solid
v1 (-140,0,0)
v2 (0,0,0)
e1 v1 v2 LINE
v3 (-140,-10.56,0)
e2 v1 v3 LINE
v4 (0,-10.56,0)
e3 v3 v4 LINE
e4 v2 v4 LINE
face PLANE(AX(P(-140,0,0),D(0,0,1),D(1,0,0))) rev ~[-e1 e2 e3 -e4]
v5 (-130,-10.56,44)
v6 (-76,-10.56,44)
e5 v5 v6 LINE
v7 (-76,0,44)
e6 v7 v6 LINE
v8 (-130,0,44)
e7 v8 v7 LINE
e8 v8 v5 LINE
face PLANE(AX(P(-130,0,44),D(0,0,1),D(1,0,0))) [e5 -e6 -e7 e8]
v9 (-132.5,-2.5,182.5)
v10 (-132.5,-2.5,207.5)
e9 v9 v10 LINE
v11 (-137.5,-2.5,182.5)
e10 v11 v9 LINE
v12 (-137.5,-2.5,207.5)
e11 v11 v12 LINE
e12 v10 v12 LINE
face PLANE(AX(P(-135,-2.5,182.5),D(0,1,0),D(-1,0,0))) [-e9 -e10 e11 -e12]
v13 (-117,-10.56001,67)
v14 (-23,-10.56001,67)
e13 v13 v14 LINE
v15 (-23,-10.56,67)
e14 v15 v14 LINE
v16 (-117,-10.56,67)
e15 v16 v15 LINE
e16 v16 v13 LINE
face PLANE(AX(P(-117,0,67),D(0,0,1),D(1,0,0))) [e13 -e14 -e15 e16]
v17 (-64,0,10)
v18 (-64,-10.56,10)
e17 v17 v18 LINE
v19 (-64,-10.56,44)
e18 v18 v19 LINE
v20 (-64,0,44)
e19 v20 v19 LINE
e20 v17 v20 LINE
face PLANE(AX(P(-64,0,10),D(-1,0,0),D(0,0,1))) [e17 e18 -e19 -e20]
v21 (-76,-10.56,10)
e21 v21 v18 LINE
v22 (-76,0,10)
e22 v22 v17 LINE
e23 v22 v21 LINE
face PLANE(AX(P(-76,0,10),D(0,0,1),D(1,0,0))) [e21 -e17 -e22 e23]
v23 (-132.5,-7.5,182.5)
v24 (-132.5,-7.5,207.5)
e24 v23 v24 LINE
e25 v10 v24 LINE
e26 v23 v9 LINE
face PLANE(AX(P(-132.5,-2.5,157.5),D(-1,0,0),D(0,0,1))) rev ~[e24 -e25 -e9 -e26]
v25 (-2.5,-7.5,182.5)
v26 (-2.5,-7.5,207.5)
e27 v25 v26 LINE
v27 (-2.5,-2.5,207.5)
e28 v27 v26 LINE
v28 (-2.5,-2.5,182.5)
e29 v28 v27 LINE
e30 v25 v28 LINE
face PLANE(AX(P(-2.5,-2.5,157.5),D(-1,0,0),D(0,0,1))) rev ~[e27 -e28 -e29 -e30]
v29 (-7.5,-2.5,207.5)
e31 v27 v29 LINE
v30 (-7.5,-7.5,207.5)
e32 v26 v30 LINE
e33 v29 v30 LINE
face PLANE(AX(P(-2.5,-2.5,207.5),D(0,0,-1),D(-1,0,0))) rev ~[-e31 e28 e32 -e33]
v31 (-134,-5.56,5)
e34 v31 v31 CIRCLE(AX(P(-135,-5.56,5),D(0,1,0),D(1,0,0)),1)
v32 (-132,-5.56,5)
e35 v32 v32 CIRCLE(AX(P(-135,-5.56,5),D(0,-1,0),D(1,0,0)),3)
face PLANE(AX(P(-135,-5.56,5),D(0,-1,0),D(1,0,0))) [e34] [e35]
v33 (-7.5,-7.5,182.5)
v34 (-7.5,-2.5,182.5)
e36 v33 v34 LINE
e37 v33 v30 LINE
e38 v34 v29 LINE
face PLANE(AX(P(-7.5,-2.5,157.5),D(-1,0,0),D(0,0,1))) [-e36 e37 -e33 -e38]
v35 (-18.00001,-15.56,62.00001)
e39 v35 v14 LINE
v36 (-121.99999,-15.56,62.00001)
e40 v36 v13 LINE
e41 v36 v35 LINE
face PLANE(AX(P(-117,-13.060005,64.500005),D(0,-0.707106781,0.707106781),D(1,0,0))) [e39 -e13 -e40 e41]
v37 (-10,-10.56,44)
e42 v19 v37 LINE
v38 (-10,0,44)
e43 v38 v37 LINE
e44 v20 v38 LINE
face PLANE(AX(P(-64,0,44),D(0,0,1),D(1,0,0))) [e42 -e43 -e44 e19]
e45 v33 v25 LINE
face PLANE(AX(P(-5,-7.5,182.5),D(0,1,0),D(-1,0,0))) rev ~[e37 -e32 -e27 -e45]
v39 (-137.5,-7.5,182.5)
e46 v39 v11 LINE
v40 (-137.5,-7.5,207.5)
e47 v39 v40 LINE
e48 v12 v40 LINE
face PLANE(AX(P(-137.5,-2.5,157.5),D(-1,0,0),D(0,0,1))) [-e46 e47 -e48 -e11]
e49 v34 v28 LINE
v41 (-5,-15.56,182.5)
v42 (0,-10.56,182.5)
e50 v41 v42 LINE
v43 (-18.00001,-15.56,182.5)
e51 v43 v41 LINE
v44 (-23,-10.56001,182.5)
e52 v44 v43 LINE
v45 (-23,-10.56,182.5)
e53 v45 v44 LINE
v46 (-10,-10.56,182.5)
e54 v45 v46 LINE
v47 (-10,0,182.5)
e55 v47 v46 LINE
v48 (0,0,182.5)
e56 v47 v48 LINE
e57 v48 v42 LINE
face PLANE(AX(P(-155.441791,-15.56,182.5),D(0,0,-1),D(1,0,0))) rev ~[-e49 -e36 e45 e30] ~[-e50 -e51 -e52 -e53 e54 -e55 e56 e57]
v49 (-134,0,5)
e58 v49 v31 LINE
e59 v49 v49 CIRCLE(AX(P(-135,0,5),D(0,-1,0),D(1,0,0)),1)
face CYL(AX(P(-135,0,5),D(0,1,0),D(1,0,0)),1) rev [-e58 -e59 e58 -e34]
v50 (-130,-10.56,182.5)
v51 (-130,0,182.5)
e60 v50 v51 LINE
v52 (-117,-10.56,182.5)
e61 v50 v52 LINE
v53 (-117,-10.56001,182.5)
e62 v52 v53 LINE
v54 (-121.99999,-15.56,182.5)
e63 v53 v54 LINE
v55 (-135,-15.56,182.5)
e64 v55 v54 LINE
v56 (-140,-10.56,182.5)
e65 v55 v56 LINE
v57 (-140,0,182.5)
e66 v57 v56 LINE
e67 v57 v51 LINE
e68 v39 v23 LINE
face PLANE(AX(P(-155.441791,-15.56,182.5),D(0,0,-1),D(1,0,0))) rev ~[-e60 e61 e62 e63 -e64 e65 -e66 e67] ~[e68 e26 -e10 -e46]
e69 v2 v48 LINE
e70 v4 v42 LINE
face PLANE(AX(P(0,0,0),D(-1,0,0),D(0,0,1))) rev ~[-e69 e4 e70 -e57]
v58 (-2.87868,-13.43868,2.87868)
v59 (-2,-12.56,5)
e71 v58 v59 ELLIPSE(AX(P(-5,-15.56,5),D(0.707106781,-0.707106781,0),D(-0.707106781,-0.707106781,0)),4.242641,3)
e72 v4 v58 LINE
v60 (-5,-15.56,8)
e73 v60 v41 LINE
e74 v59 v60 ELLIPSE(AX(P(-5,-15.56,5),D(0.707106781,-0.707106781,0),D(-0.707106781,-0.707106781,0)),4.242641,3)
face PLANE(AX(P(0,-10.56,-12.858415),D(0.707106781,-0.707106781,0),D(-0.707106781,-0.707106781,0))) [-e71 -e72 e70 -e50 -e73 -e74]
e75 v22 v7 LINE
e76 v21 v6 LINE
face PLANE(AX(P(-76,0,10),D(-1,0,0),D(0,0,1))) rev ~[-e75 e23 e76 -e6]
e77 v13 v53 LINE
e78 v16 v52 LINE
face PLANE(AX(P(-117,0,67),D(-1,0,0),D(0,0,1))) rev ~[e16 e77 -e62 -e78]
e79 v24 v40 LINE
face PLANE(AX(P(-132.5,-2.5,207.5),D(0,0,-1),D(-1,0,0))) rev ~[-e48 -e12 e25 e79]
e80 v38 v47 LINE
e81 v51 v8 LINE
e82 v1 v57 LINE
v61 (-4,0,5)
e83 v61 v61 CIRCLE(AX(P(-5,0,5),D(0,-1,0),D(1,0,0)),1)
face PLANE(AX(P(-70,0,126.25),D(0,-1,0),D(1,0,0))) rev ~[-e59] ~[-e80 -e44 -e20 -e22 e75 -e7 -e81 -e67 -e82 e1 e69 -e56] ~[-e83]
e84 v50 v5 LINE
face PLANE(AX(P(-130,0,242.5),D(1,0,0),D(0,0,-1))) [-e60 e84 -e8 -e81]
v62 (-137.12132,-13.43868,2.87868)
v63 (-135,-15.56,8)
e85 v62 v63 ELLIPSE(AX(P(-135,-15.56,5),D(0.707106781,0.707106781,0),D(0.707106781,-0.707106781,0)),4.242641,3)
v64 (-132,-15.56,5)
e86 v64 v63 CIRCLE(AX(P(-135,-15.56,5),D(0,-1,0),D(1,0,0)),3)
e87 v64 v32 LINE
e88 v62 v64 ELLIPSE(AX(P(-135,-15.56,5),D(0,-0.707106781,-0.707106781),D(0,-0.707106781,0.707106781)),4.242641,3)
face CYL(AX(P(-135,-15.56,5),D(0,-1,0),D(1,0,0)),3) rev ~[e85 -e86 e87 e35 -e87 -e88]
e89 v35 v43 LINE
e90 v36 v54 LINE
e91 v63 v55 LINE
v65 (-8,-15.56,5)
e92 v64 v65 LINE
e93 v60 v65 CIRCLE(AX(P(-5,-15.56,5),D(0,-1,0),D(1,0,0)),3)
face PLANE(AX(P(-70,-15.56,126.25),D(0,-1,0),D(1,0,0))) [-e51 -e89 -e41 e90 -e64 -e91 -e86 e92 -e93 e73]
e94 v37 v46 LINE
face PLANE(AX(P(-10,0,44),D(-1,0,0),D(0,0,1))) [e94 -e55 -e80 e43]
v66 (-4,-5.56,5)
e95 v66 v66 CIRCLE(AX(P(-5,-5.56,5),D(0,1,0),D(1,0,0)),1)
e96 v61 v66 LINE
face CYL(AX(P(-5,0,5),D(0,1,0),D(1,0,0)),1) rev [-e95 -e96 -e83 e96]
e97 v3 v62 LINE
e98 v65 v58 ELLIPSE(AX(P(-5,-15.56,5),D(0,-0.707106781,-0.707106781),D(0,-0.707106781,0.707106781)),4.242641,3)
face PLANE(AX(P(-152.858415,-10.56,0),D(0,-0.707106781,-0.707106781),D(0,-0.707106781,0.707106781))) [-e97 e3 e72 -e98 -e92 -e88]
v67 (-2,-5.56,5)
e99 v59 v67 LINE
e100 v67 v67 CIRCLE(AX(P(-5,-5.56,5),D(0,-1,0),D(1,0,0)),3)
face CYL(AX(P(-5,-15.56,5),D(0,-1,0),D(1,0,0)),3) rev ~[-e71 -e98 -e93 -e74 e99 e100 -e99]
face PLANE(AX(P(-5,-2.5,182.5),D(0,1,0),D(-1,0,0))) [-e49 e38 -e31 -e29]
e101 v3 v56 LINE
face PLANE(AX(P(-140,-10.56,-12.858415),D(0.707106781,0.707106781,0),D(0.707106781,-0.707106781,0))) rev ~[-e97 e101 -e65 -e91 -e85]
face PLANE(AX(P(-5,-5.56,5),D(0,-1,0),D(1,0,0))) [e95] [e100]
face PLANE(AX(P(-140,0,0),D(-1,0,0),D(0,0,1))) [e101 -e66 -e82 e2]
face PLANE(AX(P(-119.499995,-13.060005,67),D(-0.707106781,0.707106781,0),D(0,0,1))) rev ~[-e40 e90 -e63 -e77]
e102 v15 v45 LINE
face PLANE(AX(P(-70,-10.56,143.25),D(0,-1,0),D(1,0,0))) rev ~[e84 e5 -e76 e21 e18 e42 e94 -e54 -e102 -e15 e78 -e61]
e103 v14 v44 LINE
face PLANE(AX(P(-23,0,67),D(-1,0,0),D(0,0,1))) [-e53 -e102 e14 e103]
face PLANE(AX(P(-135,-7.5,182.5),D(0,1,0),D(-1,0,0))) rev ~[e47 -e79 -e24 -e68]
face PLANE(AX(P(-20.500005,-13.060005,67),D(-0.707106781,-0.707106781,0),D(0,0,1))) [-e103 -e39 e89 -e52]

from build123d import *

# Parameters (mm, degrees)
F0_W        = 140
F0_H        = 252.5
F0_R        = 1
F0_W_2      = 94
F0_H_2      = 152.5
F0_R_2      = 2.5
F0_W_3      = 12
F0_H_3      = 34
F1_DEPTH    = 15.56
F2_DEPTH    = 10.56
F3_T1_DEPTH = 165.7168298797
F3_T3_DEPTH = 278.2168298797
F4_SIZE     = 2.5
F5_R        = 3
F6_DEPTH    = 10
F7_SIZE     = 4.99999
F8_W        = 161.2529857084
F8_H        = 70
F9_DEPTH    = 25
F11_W       = 5
F11_H       = 50
F12_DEPTH   = 5


# Not quite as in the source:
# - a fillet or chamfer that OpenCascade refuses, or shapes differently, is made with other operations: its cross-section is extruded or revolved along the edge and cut away or added
# - a fillet or chamfer is up to 0.001 mm smaller than in the source, because OpenCascade refuses the exact size
# - a feature names something its author has since deleted; it is built from what else it names


with BuildPart() as f1:
    # F0 (on Front) → F1 (new body)
    with BuildSketch(Plane.XZ):
        with Locations((-70, 126.25)):
            Rectangle(F0_W, F0_H)
        with Locations((-135, 5)):
            Circle(F0_R, mode=Mode.SUBTRACT)
        with Locations((-5, 5)):
            Circle(F0_R, mode=Mode.SUBTRACT)
        with Locations((-135, 247.5)):
            Circle(F0_R, mode=Mode.SUBTRACT)
        Polygon((-130, 44), (-130, 242.5), (-10, 242.5), (-10, 44), (-64, 44), (-64, 10), (-76, 10), (-76, 44), align=None, mode=Mode.SUBTRACT)
        with Locations((-5, 247.5)):
            Circle(F0_R, mode=Mode.SUBTRACT)
        Polygon((-10, 242.5), (-130, 242.5), (-130, 44), (-76, 44), (-64, 44), (-10, 44), align=None)
        with Locations((-70, 143.25)):
            Rectangle(F0_W_2, F0_H_2, mode=Mode.SUBTRACT)
        with Locations((-70, 232.5)):
            Circle(F0_R_2, mode=Mode.SUBTRACT)
        with Locations((-70, 27)):
            Rectangle(F0_W_3, F0_H_3)
    extrude(amount=F1_DEPTH)

    # F0 (on Front) → F2 (cut)
    with BuildSketch(Plane.XZ):
        Polygon((-10, 242.5), (-130, 242.5), (-130, 44), (-76, 44), (-64, 44), (-10, 44), align=None)
        with Locations((-70, 143.25)):
            Rectangle(F0_W_2, F0_H_2, mode=Mode.SUBTRACT)
        with Locations((-70, 232.5)):
            Circle(F0_R_2, mode=Mode.SUBTRACT)
        with Locations((-70, 27)):
            Rectangle(F0_W_3, F0_H_3)
    extrude(amount=F2_DEPTH, mode=Mode.SUBTRACT)

    # F3: chamfer of 5 on 4 edges, made by hand

    # F3_s2 → F3_t1 (cut)
    with BuildSketch(Plane.YZ.offset(-152.8584149398)):
        Polygon((-10.56, 0), (-15.56, 5), (-15.56, 0), align=None)
        Polygon((-15.56, 247.5), (-10.56, 252.5), (-15.56, 252.5), align=None)
    extrude(amount=F3_T1_DEPTH, mode=Mode.SUBTRACT)

    # F3_s4 → F3_t3 (cut)
    with BuildSketch(Plane.XY.offset(-12.8584149398)):
        Polygon((-140, -10.56), (-135, -15.56), (-140, -15.56), align=None)
        Polygon((0, -10.56), (-5, -15.56), (0, -15.56), align=None)
    extrude(amount=F3_T3_DEPTH, mode=Mode.SUBTRACT)

    # F4
    f4_edges = [f1.edges().sort_by_distance(p)[0] for p in [
        (-72.5, -15.56, 232.5),
    ]]
    chamfer(f4_edges, length=F4_SIZE)

    # F5 (on face) → F6 (cut)
    with BuildSketch(Plane.XZ.offset(15.56)):
        with Locations((-135, 247.5)):
            Circle(F5_R)
        with Locations((-135, 5)):
            Circle(F5_R)
        with Locations((-5, 247.5)):
            Circle(F5_R)
        with Locations((-5, 5)):
            Circle(F5_R)
    extrude(amount=-F6_DEPTH, mode=Mode.SUBTRACT)

    # F7 (size 5 in the source; OpenCascade refuses exactly that, so slightly less here)
    f7_edges = [f1.edges().sort_by_distance(p)[0] for p in [
        (-70, -15.56, 67),
        (-117, -15.56, 143.25),
        (-23, -15.56, 143.25),
        (-70, -15.56, 219.5),
    ]]
    chamfer(f7_edges, length=F7_SIZE)

    # F8 (on face) → F9 (cut)
    with BuildSketch(Plane.XZ.offset(15.56)):
        with Locations((-74.815297965, 217.5)):
            Rectangle(F8_W, F8_H)
    extrude(amount=-F9_DEPTH, mode=Mode.SUBTRACT)

    # F11 (on offset) → F12 (join)
    with BuildSketch(Plane(origin=(0, -2.5, 0), x_dir=(-1, 0, 0), z_dir=(0, 1, 0))):
        with Locations((135, 182.5)):
            Rectangle(F11_W, F11_H)
        with Locations((5, 182.5)):
            Rectangle(F11_W, F11_H)
    extrude(amount=-F12_DEPTH)


solid = f1.part
